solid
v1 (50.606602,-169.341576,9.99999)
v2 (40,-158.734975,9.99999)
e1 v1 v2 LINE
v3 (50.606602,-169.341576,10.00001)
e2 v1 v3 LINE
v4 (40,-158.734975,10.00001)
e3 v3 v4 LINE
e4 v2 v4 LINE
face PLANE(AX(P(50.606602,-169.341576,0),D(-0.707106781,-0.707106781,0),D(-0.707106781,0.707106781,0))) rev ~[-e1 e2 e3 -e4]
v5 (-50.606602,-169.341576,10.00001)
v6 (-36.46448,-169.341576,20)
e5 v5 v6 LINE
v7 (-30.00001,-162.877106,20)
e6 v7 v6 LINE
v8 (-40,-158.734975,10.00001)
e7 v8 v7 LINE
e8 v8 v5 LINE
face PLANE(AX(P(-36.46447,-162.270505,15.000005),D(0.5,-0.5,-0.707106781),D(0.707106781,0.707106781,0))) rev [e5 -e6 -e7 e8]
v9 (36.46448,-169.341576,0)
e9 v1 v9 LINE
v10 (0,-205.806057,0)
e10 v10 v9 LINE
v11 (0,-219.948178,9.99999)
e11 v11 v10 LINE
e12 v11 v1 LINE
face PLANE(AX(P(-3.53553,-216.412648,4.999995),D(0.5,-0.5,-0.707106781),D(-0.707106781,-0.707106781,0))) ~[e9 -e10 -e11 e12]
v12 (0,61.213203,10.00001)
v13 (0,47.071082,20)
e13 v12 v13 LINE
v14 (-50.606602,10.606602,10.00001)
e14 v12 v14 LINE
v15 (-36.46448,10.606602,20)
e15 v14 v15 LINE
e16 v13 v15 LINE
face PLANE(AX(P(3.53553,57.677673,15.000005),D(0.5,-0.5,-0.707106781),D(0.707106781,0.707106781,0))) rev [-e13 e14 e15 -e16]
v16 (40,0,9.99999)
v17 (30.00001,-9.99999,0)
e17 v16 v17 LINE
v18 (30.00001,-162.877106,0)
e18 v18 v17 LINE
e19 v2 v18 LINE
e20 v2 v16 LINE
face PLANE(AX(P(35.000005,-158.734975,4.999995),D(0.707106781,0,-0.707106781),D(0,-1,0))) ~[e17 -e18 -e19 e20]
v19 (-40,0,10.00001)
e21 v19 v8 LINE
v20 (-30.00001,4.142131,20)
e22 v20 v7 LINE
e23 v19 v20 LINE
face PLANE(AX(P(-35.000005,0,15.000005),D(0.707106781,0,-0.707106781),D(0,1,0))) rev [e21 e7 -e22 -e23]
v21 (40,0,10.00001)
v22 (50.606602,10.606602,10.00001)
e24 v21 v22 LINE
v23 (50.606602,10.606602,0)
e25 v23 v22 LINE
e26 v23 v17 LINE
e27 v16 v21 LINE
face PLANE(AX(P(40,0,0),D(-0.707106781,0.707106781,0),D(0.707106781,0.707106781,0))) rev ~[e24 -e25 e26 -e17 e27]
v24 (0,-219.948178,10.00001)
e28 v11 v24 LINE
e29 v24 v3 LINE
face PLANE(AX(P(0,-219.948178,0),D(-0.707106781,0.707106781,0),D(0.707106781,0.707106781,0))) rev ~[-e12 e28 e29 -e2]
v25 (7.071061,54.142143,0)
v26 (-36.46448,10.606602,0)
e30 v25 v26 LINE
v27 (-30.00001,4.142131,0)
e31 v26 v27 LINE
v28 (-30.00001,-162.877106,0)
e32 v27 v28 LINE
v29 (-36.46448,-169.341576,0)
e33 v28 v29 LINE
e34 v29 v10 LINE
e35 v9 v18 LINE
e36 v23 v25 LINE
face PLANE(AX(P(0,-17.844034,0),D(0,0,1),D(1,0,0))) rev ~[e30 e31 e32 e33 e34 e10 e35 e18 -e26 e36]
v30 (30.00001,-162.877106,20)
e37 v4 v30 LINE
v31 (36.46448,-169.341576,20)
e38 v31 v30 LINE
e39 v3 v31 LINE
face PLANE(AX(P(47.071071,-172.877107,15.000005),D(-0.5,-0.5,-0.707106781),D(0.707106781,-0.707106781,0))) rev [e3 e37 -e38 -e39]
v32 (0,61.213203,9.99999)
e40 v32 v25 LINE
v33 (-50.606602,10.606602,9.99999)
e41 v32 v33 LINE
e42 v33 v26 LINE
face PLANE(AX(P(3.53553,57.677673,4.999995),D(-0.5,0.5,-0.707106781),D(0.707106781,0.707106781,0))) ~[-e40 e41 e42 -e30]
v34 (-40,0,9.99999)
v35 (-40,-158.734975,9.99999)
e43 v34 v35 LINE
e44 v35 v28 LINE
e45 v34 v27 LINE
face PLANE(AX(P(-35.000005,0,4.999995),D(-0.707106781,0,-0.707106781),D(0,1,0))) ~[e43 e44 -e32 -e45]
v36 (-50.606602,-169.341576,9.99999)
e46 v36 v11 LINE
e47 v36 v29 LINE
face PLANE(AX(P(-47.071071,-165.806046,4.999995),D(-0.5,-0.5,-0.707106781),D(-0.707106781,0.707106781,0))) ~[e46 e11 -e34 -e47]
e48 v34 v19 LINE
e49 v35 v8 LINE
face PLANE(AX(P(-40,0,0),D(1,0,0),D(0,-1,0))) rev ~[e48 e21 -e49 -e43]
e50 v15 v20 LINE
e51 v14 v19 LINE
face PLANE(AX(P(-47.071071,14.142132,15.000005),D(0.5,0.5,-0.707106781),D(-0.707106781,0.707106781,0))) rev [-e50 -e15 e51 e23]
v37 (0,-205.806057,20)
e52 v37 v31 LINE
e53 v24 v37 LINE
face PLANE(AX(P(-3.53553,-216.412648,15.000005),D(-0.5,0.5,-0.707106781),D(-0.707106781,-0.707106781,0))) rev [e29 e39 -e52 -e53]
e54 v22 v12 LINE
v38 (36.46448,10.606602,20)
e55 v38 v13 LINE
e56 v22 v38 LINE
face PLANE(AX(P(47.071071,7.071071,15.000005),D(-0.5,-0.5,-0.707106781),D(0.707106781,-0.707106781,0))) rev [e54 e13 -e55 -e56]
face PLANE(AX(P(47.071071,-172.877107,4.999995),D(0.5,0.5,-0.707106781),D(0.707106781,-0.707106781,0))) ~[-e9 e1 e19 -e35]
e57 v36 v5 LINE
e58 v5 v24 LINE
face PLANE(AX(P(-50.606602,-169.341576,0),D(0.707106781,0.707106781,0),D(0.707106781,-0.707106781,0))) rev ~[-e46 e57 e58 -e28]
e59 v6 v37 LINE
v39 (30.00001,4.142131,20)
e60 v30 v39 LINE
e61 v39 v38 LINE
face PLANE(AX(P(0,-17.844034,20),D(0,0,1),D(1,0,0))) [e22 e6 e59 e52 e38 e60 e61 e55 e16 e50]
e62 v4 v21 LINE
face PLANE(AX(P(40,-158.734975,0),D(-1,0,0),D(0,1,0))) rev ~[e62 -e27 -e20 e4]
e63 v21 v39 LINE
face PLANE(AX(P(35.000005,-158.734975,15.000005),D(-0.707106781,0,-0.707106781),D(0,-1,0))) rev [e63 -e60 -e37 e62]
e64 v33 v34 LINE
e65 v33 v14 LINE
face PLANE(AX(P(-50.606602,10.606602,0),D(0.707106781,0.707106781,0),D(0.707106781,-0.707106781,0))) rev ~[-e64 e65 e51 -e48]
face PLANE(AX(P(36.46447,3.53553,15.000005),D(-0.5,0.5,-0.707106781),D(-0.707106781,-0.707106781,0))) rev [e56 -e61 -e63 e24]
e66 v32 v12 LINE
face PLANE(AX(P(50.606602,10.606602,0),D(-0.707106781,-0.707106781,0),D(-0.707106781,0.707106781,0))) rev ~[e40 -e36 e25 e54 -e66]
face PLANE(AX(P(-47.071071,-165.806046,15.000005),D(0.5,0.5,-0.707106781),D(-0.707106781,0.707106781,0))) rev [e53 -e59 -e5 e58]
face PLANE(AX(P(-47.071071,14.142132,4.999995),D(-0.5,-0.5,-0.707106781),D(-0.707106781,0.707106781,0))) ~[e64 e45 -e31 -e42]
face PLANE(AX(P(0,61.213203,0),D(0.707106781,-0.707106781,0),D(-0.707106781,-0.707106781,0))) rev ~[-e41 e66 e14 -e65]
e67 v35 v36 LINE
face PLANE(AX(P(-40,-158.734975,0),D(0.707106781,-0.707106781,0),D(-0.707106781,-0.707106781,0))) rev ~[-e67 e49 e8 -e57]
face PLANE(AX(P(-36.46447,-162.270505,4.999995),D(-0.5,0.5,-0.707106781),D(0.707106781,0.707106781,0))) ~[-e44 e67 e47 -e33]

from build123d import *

# Parameters (mm, degrees)
F1_DEPTH = 20
F2_SIZE2 = 9.99999
F2_SIZE  = 9.99999


# Not quite as in the source:
# - a fillet or chamfer is up to 0.001 mm smaller than in the source, because OpenCascade refuses the exact size


with BuildPart() as f1:
    # F0 (on Top) → F1 (new body)
    with BuildSketch(Plane.XY):
        Polygon((-50.6066017178, 10.6066017178), (-40, 0), (-40, -79.367487377), (40, -79.367487377), (40, 0), (50.6066017178, 10.6066017178), (0, 61.2132034356), align=None)
        Polygon((40, -79.367487377), (-40, -79.367487377), (-40, -158.7349747541), (-50.6066017178, -169.3415764719), (0, -219.9481781897), (50.6066017178, -169.3415764719), (40, -158.7349747541), align=None)
    extrude(amount=F1_DEPTH)

    # F2 (size 10 and 10 in the source; OpenCascade refuses exactly that, so slightly less here)
    f2_edges = [f1.edges().sort_by_distance(p)[0] for p in [
        (40, -79.367487, 20),
        (25.303301, 35.909903, 20),
        (-25.303301, 35.909903, 20),
        (-45.303301, 5.303301, 20),
        (45.303301, 5.303301, 20),
        (-40, -79.367487, 20),
        (-45.303301, -164.038276, 20),
        (-25.303301, -194.644877, 20),
        (25.303301, -194.644877, 20),
        (45.303301, -164.038276, 20),
        (40, -79.367487, 0),
        (25.303301, -194.644877, 0),
        (45.303301, -164.038276, 0),
        (-25.303301, -194.644877, 0),
        (-45.303301, -164.038276, 0),
        (-40, -79.367487, 0),
        (-45.303301, 5.303301, 0),
        (-25.303301, 35.909903, 0),
    ]]
    chamfer(f2_edges, length=F2_SIZE, length2=F2_SIZE2)


solid = f1.part
